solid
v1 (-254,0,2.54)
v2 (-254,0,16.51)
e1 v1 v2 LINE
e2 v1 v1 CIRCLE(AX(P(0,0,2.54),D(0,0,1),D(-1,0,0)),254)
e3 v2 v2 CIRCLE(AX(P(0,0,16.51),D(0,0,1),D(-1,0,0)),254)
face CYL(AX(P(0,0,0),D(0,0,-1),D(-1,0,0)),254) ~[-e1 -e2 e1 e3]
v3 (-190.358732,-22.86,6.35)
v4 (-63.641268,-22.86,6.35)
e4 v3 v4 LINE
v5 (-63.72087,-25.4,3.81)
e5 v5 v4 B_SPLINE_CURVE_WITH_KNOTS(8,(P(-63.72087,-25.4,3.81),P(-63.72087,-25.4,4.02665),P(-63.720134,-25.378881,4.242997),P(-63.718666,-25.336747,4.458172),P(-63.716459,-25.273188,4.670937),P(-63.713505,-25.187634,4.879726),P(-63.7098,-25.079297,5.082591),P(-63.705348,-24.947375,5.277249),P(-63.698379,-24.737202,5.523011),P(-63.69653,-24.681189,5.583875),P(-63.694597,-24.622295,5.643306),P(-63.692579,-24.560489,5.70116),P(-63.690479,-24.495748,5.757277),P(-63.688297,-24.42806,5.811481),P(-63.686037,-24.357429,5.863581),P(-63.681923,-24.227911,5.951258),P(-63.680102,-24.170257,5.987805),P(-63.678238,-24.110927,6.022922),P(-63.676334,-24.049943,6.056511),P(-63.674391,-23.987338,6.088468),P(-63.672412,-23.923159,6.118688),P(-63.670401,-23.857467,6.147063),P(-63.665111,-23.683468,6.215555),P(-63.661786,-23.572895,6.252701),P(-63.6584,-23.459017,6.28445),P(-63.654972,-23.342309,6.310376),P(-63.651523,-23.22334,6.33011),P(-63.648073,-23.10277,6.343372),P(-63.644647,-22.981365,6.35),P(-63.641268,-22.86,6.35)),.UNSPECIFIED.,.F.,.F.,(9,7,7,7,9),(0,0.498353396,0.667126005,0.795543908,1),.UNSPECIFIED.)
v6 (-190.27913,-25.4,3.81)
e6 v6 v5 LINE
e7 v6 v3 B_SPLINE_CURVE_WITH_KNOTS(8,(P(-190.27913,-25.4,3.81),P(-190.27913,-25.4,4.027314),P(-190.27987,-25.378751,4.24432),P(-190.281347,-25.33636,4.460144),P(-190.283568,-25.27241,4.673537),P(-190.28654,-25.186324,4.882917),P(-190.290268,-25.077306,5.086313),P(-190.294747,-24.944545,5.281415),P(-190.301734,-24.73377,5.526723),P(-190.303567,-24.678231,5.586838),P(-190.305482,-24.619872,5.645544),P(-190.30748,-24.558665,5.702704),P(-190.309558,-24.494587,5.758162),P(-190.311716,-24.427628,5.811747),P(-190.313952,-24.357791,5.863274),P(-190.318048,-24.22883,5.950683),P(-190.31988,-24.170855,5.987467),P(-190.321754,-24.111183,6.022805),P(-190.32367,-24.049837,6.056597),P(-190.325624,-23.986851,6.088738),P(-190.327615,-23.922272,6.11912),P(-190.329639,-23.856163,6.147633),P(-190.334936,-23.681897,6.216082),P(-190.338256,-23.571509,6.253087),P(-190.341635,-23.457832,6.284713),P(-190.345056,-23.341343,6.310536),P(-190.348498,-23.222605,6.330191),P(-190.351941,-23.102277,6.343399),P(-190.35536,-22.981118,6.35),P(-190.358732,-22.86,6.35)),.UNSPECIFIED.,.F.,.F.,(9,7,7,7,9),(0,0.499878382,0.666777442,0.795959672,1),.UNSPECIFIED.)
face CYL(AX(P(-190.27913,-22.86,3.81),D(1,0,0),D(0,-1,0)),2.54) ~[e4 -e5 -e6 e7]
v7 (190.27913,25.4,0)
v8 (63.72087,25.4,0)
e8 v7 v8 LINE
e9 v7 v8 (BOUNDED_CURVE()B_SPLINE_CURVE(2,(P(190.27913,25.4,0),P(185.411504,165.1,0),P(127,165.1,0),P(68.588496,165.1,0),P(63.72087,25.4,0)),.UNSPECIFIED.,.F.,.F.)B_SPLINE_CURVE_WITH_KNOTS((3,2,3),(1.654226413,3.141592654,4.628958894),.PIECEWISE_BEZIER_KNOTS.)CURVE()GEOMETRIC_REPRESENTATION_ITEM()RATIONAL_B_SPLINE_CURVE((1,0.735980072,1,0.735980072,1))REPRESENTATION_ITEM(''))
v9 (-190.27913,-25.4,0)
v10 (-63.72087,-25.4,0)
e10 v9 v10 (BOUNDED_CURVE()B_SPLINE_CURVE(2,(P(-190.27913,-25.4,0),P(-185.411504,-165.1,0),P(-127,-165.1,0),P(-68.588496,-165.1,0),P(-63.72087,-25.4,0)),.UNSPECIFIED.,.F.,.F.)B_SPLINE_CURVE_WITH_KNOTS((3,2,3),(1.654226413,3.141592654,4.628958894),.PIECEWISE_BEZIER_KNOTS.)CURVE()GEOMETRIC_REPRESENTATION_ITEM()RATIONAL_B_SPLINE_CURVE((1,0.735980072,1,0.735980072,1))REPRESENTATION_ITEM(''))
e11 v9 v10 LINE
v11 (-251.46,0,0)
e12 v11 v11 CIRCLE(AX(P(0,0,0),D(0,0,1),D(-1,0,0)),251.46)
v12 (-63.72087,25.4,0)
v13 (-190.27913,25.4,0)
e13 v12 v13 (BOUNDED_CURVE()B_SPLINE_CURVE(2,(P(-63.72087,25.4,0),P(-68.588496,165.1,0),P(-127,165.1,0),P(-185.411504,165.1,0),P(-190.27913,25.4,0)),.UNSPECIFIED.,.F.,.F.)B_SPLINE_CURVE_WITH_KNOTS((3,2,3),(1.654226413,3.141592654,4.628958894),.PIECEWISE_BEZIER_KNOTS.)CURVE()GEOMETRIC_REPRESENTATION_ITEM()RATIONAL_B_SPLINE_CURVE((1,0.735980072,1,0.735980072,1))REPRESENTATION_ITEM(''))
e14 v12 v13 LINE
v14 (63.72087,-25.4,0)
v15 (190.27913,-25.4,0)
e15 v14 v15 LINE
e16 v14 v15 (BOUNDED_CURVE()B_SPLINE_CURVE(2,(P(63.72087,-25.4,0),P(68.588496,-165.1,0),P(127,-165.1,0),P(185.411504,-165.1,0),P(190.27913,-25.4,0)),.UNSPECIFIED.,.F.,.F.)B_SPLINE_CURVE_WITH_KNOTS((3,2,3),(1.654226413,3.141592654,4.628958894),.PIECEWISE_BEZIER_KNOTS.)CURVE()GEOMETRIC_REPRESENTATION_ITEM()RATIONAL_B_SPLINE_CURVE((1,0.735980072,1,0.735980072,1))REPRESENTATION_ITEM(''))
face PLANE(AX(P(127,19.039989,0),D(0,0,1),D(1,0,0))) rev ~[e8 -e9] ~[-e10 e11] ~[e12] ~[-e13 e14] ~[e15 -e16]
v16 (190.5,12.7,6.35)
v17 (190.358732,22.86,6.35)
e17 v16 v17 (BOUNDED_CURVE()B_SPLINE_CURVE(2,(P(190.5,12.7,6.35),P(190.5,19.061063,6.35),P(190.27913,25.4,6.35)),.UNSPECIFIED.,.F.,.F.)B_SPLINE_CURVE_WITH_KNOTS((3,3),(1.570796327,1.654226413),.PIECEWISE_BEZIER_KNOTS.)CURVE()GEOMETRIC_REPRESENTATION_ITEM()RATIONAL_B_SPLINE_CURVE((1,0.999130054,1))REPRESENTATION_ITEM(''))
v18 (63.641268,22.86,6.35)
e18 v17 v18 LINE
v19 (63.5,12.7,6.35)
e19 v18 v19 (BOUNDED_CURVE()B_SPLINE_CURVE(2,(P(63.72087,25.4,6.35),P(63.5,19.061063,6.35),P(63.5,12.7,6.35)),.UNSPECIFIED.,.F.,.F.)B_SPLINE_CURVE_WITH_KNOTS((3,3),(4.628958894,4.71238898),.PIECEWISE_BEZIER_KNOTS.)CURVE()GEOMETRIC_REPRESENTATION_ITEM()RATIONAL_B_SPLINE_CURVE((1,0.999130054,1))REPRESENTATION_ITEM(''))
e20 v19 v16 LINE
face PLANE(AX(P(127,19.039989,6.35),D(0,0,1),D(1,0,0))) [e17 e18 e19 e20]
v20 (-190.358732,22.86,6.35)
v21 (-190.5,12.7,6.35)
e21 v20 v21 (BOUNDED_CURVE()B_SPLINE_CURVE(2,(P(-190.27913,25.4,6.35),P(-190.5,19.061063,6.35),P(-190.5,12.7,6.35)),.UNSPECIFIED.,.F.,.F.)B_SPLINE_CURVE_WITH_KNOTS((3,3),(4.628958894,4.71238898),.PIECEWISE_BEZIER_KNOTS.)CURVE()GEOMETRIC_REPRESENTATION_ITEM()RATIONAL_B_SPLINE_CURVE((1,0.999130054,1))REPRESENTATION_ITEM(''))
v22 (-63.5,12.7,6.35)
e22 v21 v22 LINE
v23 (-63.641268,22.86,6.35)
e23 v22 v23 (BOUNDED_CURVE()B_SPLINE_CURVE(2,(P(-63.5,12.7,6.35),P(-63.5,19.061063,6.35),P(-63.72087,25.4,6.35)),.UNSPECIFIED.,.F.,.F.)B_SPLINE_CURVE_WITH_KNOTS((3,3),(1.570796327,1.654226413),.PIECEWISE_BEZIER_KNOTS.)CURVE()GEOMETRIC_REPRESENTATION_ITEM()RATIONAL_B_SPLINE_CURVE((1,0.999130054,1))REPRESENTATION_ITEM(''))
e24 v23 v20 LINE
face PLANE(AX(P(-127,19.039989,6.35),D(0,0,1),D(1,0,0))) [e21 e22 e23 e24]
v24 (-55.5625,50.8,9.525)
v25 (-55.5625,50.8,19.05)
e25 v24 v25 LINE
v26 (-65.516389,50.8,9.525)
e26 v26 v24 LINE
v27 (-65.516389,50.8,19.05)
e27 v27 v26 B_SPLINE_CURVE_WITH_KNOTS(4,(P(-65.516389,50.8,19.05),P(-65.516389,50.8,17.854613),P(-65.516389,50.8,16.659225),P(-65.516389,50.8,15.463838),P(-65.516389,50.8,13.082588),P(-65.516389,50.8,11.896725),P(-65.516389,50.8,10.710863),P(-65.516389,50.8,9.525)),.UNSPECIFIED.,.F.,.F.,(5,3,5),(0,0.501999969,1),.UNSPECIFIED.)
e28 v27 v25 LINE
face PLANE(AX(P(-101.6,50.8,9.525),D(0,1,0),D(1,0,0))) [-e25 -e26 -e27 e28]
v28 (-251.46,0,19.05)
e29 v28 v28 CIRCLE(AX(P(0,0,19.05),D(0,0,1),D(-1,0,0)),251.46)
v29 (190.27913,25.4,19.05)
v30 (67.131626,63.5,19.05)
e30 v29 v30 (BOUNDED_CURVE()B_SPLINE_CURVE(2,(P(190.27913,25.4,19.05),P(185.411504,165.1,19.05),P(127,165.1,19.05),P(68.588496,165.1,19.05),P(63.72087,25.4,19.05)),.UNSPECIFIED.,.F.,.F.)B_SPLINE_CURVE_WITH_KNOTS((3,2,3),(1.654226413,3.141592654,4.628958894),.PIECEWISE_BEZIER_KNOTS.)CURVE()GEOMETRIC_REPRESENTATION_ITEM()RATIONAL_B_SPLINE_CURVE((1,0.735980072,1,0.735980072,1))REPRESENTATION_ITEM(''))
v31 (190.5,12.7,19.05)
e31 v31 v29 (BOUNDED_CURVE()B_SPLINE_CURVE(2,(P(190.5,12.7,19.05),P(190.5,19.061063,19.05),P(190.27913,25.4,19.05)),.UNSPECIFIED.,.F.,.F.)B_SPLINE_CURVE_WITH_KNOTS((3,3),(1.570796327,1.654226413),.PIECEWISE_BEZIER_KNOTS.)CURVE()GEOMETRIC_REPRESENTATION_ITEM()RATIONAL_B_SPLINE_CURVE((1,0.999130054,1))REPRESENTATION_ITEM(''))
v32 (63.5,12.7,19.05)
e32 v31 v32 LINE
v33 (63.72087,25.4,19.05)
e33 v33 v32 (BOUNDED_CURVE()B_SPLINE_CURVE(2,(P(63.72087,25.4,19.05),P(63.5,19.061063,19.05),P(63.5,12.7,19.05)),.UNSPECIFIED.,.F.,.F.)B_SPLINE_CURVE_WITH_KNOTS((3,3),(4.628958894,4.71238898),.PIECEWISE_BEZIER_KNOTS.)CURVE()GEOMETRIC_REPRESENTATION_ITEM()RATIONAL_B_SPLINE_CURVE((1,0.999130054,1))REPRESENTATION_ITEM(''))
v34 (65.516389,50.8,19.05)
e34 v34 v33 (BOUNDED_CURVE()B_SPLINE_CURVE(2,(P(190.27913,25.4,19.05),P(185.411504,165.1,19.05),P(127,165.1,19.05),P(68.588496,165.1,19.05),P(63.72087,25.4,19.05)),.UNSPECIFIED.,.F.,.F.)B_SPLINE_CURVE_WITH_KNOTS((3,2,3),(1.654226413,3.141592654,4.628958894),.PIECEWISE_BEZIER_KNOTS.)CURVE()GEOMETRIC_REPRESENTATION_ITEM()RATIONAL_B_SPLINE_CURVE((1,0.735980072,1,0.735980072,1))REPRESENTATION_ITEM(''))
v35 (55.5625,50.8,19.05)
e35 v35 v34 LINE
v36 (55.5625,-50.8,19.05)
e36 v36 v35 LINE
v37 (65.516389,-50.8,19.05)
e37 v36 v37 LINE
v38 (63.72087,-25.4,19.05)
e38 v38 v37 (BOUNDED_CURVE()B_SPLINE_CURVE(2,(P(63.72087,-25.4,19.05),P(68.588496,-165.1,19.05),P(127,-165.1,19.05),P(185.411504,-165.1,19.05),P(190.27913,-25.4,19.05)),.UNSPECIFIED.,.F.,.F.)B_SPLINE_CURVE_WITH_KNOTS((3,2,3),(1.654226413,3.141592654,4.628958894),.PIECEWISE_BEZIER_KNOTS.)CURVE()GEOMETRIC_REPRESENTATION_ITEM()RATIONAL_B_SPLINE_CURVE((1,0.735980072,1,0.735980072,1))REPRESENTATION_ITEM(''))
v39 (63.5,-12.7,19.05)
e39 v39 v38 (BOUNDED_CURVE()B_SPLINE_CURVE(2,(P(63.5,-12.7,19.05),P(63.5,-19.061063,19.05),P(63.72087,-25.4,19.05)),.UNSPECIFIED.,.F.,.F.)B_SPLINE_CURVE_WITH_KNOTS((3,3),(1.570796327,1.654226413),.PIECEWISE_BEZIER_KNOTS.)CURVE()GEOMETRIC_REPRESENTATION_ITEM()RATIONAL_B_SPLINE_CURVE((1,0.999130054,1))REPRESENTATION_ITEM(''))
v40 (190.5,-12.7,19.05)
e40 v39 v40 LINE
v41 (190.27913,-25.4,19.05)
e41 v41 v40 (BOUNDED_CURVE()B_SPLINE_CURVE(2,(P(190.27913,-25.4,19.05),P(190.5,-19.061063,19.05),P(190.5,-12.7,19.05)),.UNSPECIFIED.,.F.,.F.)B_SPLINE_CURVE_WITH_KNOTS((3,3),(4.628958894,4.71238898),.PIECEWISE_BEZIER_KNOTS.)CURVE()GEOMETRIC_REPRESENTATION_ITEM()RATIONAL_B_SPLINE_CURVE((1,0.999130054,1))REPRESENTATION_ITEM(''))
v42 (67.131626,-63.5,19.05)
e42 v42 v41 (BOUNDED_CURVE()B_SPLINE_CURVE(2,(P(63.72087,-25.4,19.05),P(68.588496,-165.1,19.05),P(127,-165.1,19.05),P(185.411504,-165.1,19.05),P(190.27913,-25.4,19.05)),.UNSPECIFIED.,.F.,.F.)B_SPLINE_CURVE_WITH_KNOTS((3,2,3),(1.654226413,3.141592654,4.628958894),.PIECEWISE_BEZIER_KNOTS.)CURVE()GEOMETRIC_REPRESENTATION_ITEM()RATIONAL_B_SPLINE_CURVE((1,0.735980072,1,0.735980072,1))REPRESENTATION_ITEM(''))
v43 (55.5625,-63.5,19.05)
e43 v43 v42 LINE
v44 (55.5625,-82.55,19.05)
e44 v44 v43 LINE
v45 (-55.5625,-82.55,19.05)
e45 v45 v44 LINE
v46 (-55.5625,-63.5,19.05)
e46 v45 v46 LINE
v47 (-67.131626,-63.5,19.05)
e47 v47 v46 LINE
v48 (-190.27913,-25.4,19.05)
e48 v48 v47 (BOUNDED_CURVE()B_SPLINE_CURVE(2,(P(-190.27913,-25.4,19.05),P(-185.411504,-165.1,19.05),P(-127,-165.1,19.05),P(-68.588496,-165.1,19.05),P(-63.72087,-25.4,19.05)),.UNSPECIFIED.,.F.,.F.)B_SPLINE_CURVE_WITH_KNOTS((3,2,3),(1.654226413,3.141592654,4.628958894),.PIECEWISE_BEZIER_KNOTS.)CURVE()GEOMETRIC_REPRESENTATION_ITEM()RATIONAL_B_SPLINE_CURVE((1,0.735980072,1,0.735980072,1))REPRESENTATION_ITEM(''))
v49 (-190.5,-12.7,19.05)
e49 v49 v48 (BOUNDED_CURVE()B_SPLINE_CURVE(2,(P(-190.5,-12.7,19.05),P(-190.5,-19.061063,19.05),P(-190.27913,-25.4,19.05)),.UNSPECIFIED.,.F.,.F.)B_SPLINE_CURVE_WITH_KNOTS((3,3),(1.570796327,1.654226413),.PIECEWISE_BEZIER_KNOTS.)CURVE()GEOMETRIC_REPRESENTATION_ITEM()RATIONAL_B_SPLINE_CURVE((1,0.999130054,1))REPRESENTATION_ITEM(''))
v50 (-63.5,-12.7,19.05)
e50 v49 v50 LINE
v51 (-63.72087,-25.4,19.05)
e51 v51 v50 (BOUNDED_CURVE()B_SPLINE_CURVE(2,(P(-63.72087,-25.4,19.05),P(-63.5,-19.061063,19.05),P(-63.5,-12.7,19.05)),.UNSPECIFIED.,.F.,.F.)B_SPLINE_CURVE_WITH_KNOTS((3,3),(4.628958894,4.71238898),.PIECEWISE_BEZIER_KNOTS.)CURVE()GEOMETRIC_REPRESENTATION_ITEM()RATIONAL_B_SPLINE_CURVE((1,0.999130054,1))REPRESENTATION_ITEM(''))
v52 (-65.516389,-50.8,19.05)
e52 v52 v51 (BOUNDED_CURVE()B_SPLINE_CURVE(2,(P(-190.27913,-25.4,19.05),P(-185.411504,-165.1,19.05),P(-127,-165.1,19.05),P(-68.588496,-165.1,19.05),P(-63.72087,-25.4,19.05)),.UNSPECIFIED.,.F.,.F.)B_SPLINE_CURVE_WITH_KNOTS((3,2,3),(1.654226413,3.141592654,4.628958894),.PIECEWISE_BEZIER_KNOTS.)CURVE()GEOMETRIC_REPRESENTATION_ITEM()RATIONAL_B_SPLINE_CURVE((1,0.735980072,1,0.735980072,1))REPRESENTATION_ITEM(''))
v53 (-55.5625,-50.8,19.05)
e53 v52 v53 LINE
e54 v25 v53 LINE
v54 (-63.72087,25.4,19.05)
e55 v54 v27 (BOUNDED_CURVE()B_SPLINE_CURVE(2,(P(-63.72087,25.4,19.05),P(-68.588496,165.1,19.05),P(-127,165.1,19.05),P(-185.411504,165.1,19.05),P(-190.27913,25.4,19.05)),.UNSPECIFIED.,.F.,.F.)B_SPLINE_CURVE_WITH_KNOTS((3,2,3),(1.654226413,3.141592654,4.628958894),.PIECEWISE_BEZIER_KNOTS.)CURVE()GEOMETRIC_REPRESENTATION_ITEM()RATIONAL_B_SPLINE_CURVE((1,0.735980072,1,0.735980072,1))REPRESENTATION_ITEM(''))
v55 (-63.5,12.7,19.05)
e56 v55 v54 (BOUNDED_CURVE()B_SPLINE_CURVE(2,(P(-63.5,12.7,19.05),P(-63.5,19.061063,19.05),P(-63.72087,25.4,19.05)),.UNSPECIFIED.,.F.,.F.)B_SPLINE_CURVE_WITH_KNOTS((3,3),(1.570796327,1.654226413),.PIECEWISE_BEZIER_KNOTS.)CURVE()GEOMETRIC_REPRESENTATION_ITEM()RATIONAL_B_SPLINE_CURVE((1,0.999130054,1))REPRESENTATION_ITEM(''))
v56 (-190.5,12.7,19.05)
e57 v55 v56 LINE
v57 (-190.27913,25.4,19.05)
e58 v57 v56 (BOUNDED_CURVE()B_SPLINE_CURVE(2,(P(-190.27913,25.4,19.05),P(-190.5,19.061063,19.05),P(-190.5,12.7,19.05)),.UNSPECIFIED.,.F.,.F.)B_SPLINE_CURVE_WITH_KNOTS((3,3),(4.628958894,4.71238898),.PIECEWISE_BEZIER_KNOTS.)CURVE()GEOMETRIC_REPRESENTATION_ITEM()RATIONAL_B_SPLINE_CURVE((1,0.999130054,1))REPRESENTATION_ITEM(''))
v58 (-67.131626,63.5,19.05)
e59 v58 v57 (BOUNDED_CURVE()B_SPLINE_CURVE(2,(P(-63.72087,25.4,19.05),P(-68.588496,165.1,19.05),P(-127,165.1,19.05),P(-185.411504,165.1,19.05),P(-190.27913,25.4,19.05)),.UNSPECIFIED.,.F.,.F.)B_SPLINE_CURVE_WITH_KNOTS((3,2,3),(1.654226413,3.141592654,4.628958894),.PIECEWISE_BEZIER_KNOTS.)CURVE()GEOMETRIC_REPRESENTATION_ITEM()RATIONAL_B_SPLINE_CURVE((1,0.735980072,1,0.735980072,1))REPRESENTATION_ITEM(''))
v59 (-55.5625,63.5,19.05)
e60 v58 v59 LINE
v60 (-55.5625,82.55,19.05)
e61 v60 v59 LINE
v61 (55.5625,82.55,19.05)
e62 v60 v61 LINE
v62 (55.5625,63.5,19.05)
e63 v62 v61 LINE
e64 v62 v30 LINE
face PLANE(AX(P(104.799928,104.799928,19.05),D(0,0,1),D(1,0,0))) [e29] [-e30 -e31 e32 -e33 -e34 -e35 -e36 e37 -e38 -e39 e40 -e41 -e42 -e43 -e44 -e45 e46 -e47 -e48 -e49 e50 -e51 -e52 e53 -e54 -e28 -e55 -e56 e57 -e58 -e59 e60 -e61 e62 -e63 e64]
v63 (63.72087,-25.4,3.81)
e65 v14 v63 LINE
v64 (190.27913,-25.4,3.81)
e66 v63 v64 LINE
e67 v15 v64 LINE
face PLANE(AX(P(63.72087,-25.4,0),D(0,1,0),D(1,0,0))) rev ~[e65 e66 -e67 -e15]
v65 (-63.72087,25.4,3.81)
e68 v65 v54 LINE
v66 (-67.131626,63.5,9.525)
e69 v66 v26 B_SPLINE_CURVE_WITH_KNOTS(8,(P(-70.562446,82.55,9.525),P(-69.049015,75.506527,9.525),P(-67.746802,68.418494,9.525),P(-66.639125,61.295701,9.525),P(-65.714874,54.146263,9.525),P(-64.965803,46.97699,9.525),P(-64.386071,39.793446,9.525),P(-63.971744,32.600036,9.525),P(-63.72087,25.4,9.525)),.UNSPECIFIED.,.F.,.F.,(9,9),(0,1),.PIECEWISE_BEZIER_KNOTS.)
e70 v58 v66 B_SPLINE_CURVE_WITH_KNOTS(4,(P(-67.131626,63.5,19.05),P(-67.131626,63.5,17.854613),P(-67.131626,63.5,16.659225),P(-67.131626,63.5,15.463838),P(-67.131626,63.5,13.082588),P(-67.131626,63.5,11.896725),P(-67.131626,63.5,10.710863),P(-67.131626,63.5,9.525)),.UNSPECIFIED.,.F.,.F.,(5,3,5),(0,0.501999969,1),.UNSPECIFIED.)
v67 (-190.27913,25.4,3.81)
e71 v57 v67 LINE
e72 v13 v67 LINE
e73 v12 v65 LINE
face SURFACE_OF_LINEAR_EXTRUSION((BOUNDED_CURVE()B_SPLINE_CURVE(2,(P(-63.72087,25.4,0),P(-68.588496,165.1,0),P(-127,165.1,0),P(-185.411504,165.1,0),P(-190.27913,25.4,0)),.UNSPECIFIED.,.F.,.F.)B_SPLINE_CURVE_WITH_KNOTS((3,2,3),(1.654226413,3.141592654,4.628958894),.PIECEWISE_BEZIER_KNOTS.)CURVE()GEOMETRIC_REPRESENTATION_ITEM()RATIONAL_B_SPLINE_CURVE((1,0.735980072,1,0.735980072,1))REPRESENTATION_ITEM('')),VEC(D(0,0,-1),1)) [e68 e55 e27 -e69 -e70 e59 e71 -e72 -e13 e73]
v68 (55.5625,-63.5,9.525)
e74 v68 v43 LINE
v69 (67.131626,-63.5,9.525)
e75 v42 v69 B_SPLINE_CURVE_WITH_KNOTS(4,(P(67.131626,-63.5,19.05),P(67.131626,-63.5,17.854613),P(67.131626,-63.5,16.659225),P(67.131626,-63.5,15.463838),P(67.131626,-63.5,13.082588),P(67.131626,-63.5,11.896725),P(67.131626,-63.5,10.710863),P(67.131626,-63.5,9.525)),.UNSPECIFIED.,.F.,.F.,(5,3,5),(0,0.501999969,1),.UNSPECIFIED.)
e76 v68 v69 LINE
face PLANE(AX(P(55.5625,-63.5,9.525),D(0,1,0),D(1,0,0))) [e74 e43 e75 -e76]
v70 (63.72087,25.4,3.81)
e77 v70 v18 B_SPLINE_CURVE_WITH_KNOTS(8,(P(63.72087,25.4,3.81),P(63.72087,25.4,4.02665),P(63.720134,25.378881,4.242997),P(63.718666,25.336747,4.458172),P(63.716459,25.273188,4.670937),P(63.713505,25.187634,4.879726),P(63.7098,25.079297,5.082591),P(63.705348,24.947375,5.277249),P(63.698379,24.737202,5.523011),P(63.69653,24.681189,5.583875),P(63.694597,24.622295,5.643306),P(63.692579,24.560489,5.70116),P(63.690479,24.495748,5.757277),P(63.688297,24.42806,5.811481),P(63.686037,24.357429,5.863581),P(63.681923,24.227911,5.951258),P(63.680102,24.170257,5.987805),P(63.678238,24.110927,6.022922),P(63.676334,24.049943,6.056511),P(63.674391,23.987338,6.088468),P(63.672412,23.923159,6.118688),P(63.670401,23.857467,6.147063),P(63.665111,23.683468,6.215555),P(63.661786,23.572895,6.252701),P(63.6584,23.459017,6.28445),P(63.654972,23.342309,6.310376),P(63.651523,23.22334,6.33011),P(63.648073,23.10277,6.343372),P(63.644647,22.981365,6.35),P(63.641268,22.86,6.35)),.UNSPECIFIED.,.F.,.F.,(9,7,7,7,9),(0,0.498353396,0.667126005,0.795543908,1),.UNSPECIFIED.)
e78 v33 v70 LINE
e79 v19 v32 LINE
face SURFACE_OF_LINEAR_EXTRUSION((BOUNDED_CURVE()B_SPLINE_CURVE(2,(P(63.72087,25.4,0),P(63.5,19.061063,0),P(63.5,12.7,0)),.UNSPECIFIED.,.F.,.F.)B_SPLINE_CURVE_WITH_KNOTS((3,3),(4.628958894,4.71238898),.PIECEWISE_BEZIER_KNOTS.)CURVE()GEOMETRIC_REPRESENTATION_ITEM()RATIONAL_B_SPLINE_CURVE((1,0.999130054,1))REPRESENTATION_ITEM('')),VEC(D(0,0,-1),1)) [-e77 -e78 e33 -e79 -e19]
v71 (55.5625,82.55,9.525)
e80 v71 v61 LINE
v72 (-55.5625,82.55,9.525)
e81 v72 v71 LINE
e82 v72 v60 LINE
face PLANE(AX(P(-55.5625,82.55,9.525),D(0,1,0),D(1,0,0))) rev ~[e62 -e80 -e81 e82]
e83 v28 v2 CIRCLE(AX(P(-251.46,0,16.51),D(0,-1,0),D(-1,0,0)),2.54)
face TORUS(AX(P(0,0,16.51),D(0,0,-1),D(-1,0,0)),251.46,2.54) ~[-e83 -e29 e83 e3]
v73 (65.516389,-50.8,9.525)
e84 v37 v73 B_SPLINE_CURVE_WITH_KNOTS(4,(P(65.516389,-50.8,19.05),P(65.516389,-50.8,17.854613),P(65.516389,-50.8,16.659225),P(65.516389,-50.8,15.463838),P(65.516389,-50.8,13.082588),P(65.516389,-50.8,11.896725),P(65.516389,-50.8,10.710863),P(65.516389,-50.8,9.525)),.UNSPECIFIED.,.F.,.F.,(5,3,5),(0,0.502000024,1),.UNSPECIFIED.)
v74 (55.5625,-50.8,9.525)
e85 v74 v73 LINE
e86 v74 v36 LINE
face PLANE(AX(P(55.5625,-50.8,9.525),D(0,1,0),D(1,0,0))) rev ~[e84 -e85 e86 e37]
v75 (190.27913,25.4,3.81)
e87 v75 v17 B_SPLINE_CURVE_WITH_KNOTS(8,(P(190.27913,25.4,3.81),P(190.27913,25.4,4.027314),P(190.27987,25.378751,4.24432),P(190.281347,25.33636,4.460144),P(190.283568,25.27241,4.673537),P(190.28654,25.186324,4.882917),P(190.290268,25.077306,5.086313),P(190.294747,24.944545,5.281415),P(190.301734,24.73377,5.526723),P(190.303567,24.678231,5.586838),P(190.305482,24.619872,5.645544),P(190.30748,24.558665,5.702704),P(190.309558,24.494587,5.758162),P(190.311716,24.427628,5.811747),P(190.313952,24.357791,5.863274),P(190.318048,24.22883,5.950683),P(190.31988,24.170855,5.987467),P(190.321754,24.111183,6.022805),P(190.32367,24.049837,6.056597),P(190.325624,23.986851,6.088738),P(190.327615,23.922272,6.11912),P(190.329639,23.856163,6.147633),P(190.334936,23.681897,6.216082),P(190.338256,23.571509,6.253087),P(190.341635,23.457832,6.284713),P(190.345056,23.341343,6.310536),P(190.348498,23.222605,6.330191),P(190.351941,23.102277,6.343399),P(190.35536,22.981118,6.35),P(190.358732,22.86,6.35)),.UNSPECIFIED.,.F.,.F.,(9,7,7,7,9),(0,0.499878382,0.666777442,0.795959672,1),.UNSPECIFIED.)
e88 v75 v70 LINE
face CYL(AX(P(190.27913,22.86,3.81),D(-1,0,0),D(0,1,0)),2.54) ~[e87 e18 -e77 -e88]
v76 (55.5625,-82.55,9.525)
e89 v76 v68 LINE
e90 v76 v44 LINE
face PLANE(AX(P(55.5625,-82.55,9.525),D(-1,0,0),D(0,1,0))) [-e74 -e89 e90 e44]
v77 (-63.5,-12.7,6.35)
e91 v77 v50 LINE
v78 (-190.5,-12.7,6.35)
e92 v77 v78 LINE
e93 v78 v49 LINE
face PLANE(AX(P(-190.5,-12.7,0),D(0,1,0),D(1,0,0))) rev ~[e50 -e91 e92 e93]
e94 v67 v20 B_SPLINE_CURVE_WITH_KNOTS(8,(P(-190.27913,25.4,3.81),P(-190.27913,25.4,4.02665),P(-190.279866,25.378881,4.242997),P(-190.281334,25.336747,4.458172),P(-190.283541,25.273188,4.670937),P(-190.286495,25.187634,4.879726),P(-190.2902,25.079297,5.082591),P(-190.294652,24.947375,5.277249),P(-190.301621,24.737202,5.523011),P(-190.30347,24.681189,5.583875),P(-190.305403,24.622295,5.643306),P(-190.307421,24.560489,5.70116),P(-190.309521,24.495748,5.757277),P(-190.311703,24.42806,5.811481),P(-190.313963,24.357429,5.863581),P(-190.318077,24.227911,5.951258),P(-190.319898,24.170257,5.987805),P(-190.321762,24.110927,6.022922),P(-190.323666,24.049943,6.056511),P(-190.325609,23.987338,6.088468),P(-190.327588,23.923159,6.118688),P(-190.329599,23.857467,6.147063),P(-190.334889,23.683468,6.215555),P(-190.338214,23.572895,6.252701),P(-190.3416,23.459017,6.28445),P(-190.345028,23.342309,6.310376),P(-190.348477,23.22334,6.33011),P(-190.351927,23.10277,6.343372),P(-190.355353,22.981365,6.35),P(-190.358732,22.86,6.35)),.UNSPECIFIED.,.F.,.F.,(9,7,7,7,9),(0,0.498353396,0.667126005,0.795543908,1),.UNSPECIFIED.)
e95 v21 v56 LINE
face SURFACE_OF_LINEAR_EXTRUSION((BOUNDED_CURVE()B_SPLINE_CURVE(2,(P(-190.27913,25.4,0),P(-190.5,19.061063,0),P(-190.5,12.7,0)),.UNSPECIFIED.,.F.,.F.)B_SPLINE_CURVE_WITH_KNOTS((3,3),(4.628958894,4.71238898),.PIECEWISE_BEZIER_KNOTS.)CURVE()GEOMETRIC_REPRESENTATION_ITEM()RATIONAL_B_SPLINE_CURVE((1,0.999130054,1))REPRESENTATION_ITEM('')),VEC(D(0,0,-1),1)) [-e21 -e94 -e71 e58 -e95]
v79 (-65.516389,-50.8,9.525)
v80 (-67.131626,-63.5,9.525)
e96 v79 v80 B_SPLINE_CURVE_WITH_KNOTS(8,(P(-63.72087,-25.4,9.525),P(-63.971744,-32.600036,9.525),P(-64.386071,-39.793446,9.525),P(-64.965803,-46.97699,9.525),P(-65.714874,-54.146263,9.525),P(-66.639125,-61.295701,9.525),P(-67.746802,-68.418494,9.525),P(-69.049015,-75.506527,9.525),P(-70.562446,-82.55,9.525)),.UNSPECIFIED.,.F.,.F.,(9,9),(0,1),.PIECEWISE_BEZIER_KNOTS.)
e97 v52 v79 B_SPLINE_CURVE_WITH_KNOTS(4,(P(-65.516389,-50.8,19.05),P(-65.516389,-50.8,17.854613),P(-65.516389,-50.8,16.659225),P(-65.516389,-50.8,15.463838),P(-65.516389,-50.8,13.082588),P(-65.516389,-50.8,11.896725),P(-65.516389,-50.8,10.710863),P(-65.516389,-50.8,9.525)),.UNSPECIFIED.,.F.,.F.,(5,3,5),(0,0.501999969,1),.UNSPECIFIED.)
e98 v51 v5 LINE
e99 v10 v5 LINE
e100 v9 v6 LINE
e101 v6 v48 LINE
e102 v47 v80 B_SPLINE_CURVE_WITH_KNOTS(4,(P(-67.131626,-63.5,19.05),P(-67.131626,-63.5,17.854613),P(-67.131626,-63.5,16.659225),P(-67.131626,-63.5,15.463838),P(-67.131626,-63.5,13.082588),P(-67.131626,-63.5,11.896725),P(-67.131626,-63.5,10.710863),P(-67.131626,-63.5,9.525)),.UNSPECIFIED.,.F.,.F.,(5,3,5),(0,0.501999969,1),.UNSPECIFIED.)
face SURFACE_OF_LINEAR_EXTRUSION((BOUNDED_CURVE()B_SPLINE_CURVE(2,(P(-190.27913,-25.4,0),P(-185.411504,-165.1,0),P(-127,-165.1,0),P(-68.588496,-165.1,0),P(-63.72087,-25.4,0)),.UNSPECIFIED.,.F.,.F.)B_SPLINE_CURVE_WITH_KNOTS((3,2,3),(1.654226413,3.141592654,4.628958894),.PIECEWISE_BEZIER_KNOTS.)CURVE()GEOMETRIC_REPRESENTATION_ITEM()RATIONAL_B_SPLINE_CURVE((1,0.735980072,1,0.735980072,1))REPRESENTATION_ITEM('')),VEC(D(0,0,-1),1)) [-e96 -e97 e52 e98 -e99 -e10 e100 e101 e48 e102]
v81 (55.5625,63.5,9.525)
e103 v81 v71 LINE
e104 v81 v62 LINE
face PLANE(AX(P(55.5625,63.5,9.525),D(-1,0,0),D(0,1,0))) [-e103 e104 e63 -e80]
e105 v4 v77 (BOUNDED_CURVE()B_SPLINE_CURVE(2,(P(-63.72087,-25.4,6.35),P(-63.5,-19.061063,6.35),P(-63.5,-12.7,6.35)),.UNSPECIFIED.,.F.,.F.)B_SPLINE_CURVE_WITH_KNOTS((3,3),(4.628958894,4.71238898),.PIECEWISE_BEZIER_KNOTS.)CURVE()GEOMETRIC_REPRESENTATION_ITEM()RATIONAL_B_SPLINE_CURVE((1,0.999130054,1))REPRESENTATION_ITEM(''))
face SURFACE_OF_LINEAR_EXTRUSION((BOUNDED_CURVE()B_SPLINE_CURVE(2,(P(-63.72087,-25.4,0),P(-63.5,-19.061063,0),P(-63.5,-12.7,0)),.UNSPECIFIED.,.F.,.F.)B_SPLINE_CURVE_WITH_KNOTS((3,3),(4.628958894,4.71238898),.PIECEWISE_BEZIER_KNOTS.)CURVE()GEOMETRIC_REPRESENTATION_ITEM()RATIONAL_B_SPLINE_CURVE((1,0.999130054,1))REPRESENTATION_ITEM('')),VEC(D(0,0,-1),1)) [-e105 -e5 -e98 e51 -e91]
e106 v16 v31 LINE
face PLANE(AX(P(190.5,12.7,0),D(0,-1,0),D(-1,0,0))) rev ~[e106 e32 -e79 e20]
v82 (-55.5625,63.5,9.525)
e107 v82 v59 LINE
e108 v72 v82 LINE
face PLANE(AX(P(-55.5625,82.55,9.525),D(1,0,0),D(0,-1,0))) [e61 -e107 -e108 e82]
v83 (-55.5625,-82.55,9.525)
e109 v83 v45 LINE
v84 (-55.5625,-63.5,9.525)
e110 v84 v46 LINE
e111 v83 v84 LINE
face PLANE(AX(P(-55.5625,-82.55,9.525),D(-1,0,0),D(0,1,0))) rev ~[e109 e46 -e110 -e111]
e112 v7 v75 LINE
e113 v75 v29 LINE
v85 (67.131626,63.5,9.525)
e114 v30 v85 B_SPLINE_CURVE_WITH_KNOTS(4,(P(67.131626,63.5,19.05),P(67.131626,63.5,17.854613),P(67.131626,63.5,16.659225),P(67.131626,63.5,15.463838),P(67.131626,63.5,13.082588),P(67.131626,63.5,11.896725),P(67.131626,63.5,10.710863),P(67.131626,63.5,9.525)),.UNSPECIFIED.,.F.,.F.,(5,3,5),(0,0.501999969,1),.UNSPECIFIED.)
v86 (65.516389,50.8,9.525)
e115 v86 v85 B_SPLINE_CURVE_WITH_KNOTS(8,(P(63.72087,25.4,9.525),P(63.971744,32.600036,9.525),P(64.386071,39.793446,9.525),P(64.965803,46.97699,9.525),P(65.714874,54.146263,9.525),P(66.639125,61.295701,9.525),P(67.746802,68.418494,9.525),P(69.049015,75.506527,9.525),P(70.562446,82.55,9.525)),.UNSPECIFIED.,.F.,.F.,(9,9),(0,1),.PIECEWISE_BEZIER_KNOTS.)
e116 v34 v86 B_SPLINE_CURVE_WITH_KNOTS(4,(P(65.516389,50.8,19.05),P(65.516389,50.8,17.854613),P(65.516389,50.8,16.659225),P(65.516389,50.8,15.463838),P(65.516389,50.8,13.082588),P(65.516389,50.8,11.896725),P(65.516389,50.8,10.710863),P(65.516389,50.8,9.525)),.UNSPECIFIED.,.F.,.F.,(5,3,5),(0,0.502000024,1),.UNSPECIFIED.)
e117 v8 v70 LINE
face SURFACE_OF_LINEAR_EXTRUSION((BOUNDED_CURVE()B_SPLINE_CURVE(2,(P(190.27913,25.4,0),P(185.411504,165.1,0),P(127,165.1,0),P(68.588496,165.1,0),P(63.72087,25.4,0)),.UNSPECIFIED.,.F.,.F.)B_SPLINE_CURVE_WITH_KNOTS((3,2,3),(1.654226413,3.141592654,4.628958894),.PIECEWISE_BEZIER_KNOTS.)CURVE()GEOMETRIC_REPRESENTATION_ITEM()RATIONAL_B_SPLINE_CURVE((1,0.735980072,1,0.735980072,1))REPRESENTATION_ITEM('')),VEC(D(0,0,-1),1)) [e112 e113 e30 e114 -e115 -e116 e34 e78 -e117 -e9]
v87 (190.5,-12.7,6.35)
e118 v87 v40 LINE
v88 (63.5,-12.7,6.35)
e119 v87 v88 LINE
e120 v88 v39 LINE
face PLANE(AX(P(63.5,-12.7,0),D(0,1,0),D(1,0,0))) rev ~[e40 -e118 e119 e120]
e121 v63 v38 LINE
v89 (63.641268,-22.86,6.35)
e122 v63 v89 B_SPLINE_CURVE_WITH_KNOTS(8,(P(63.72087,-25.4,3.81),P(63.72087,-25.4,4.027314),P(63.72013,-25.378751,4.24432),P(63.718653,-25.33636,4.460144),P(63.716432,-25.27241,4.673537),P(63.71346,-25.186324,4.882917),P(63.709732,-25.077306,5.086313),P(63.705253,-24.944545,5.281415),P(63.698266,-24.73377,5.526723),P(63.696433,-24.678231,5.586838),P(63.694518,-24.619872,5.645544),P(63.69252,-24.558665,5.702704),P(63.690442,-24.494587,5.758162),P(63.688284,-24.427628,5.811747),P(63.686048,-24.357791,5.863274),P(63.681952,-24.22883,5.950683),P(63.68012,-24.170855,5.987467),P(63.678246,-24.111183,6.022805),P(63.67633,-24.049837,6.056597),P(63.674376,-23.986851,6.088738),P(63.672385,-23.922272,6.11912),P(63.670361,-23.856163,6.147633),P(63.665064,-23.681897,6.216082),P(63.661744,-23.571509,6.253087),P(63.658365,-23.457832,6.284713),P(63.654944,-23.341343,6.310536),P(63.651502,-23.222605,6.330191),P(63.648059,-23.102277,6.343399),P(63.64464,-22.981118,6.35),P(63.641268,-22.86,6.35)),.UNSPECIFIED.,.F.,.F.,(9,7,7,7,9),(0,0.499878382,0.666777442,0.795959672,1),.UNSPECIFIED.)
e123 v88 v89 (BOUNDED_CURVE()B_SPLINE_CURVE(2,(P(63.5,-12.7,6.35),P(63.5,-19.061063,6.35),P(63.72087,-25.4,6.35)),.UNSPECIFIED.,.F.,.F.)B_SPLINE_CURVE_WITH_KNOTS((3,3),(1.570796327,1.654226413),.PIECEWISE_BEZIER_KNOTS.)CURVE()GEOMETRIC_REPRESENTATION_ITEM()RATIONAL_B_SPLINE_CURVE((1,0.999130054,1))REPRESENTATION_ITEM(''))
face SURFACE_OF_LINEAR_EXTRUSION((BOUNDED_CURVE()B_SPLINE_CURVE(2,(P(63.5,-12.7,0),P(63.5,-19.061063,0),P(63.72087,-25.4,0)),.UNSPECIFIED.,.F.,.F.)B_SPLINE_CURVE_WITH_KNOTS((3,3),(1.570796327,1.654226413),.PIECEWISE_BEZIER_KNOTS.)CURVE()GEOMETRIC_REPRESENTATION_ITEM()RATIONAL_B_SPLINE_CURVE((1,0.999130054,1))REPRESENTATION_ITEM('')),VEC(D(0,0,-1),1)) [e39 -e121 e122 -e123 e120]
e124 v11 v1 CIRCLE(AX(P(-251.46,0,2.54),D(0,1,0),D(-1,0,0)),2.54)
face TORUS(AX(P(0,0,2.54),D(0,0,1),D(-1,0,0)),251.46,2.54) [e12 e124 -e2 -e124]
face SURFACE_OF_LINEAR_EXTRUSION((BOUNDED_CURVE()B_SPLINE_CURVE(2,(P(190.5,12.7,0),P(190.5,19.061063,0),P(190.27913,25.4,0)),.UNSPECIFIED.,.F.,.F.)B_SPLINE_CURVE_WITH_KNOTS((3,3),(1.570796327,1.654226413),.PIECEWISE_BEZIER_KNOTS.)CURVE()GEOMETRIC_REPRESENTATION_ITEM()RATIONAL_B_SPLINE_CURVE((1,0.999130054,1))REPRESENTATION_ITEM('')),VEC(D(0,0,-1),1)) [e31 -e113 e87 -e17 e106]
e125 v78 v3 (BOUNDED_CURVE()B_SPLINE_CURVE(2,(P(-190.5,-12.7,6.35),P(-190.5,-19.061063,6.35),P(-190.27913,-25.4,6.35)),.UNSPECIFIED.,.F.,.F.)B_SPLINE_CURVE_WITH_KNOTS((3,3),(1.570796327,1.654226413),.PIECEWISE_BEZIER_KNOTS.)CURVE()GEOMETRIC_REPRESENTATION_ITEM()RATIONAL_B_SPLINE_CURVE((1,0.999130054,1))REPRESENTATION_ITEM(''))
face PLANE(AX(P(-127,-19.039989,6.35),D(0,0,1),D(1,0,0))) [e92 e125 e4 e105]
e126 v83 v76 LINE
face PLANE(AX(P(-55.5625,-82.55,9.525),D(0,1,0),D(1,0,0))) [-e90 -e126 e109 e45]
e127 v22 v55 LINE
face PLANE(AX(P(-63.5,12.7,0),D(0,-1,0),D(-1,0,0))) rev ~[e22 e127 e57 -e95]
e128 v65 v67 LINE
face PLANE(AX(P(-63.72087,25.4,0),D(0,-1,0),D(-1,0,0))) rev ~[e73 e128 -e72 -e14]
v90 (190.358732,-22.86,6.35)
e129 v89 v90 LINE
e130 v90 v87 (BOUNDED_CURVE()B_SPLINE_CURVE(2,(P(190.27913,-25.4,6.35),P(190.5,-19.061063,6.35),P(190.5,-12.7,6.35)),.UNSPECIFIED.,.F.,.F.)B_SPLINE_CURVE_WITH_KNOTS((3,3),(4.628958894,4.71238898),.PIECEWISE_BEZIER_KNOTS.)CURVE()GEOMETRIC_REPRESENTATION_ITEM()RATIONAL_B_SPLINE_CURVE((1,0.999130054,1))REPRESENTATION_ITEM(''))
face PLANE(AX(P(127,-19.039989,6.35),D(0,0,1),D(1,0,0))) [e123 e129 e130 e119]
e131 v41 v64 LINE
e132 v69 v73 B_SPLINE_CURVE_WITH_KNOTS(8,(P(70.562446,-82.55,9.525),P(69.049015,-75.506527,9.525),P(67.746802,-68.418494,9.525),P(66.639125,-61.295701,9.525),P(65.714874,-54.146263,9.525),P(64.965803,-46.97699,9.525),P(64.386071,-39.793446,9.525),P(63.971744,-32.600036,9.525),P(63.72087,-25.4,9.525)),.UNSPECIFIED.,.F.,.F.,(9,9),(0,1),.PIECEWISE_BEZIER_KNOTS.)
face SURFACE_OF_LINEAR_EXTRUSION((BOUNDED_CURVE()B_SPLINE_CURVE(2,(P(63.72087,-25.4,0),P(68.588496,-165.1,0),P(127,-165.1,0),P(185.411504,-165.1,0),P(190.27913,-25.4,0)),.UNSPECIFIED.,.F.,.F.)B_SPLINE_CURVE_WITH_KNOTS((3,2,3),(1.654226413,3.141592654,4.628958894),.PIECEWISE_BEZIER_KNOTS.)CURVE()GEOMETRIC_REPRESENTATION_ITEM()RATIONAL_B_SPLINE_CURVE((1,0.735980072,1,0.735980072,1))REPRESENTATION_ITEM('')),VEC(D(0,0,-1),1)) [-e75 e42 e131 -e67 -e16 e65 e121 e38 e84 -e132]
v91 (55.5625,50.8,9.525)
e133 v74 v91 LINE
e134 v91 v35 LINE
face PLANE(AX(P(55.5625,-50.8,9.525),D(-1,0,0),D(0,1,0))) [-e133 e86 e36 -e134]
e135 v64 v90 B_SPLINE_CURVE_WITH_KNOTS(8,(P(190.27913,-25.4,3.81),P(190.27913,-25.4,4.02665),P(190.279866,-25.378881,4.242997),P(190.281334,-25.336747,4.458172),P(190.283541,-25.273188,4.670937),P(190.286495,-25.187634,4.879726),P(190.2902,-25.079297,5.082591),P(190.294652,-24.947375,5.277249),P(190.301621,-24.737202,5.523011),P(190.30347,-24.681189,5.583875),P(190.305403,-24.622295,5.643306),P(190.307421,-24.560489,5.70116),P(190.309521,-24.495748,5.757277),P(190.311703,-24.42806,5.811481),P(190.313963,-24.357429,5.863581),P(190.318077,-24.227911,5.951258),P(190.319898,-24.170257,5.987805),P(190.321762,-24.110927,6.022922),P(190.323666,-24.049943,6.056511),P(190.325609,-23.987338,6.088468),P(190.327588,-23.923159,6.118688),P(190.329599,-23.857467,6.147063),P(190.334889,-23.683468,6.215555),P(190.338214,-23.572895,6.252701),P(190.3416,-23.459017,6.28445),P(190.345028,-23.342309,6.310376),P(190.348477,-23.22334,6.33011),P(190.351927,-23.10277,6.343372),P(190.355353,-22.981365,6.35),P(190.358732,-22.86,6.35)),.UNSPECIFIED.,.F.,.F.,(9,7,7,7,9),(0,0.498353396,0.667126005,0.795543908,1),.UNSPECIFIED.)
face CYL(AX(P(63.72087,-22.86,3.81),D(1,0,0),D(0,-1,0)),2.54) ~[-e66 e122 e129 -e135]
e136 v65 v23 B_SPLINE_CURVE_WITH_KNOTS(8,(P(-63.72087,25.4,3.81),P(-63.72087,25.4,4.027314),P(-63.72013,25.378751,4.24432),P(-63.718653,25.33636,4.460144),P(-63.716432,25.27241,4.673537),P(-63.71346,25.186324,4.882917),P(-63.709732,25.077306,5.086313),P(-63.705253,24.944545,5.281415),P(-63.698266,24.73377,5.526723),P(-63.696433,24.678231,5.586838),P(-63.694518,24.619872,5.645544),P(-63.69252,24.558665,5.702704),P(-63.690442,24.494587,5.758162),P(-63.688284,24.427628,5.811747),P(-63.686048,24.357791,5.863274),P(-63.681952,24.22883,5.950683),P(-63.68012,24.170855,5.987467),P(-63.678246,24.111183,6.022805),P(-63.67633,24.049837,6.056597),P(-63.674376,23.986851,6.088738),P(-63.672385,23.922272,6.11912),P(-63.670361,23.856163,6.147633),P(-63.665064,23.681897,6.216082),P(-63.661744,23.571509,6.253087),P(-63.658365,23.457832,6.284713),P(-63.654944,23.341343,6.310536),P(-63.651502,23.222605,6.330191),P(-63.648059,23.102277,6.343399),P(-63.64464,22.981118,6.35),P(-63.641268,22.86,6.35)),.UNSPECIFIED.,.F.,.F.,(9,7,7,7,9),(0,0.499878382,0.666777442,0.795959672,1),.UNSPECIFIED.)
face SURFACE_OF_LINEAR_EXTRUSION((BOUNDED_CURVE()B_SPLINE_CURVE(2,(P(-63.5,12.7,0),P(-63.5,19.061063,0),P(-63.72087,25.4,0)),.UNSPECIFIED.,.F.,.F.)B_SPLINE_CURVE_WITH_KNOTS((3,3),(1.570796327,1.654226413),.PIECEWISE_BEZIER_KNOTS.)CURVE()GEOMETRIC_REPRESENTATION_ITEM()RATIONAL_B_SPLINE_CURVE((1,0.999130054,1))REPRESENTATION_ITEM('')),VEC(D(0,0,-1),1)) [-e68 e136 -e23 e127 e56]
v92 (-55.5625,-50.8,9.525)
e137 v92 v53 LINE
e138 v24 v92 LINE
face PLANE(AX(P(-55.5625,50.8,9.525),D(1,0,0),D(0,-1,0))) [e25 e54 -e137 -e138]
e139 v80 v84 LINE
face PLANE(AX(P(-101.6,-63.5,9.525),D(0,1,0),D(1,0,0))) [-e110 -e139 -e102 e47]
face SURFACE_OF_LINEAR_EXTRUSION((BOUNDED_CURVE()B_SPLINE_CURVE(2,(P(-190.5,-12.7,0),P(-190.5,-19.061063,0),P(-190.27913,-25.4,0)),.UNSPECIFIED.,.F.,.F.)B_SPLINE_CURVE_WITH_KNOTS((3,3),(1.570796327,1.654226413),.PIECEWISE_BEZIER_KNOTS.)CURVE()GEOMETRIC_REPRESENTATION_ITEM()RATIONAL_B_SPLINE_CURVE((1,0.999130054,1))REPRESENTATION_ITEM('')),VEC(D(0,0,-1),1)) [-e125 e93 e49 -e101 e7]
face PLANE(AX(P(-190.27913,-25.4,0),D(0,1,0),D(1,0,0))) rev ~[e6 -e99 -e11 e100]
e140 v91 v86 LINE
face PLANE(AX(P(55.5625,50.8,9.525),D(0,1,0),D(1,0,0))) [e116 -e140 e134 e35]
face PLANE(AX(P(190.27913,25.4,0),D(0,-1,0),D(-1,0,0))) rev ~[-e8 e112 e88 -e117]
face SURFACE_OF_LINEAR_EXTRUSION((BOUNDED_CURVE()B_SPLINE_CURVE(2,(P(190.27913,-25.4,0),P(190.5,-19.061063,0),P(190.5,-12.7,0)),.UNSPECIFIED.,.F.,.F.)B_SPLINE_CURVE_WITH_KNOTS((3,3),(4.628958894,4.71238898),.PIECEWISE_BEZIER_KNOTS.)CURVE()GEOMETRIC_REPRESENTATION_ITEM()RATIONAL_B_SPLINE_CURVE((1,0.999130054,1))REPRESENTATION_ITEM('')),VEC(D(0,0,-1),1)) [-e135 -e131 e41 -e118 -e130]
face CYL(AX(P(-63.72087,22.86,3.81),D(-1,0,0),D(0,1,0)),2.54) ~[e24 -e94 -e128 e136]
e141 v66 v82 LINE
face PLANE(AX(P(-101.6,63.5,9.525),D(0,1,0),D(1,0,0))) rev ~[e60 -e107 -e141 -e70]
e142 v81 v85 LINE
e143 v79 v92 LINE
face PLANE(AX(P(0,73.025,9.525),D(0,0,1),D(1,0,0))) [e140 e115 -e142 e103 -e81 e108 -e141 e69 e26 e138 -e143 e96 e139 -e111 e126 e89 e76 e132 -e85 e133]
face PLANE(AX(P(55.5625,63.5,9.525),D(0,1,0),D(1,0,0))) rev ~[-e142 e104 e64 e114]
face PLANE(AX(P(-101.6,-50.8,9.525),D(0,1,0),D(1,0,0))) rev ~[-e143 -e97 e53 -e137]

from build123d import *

# Parameters (mm, degrees)
F1_DEPTH = 19.05
F2_DEPTH = 6.35
F4_R     = 2.54
F5_START = 9.525
F3_W     = 111.125
F3_H     = 19.05
F3_H_2   = 12.7
F3_W_2   = 46.0375
F5_DEPTH = 9.525


# Not quite as in the source:
# - two fillets or chamfers of one size are made in one step


with BuildPart() as f1:
    # F0 (on Top) → F1 (new body)
    with BuildSketch(Plane.XY):
        with BuildLine():
            Line((0, 0), (254, 0))
            ThreePointArc((254, 0), (179.6051224214, 179.6051224214), (0, 254))
            Line((0, 254), (0, 0))
        make_face()
        with BuildLine():
            add(Edge.make_bspline(
                [(190.5, 12.7), (190.5, 19.0610627513), (190.2791297656, 25.4)],
                knots=[1.5707963268, 1.5707963268, 1.5707963268, 1.6542264134, 1.6542264134, 1.6542264134], degree=2, weights=[1, 0.9991300537, 1]))
            Line((190.5, 12.7), (63.5, 12.7))
            add(Edge.make_bspline(
                [(63.7208702344, 25.4), (63.5, 19.0610627513), (63.5, 12.7)],
                knots=[4.6289588938, 4.6289588938, 4.6289588938, 4.7123889804, 4.7123889804, 4.7123889804], degree=2, weights=[1, 0.9991300537, 1]))
            add(Edge.make_bspline(
                [(190.2791297656, 25.4), (185.411504399, 165.1), (127, 165.1), (68.588495601, 165.1), (63.7208702344, 25.4)],
                knots=[1.6542264134, 1.6542264134, 1.6542264134, 3.1415926536, 3.1415926536, 4.6289588938, 4.6289588938, 4.6289588938], degree=2, weights=[1, 0.7359800722, 1, 0.7359800722, 1]))
        make_face(mode=Mode.SUBTRACT)
        with BuildLine():
            ThreePointArc((0, -254), (179.6051224214, -179.6051224214), (254, 0))
            Line((254, 0), (0, 0))
            Line((0, 0), (0, -254))
        make_face()
        with BuildLine():
            add(Edge.make_bspline(
                [(63.5, -12.7), (63.5, -19.0610627513), (63.7208702344, -25.4)],
                knots=[1.5707963268, 1.5707963268, 1.5707963268, 1.6542264134, 1.6542264134, 1.6542264134], degree=2, weights=[1, 0.9991300537, 1]))
            Line((63.5, -12.7), (190.5, -12.7))
            add(Edge.make_bspline(
                [(190.2791297656, -25.4), (190.5, -19.0610627513), (190.5, -12.7)],
                knots=[4.6289588938, 4.6289588938, 4.6289588938, 4.7123889804, 4.7123889804, 4.7123889804], degree=2, weights=[1, 0.9991300537, 1]))
            add(Edge.make_bspline(
                [(63.7208702344, -25.4), (68.588495601, -165.1), (127, -165.1), (185.411504399, -165.1), (190.2791297656, -25.4)],
                knots=[1.6542264134, 1.6542264134, 1.6542264134, 3.1415926536, 3.1415926536, 4.6289588938, 4.6289588938, 4.6289588938], degree=2, weights=[1, 0.7359800722, 1, 0.7359800722, 1]))
        make_face(mode=Mode.SUBTRACT)
        with BuildLine():
            Line((0, 0), (0, 254))
            ThreePointArc((0, 254), (-179.6051224214, 179.6051224214), (-254, 0))
            Line((-254, 0), (0, 0))
        make_face()
        with BuildLine():
            add(Edge.make_bspline(
                [(-63.5, 12.7), (-63.5, 19.0610627513), (-63.7208702344, 25.4)],
                knots=[1.5707963268, 1.5707963268, 1.5707963268, 1.6542264134, 1.6542264134, 1.6542264134], degree=2, weights=[1, 0.9991300537, 1]))
            Line((-63.5, 12.7), (-190.5, 12.7))
            add(Edge.make_bspline(
                [(-190.2791297656, 25.4), (-190.5, 19.0610627513), (-190.5, 12.7)],
                knots=[4.6289588938, 4.6289588938, 4.6289588938, 4.7123889804, 4.7123889804, 4.7123889804], degree=2, weights=[1, 0.9991300537, 1]))
            add(Edge.make_bspline(
                [(-63.7208702344, 25.4), (-68.588495601, 165.1), (-127, 165.1), (-185.411504399, 165.1), (-190.2791297656, 25.4)],
                knots=[1.6542264134, 1.6542264134, 1.6542264134, 3.1415926536, 3.1415926536, 4.6289588938, 4.6289588938, 4.6289588938], degree=2, weights=[1, 0.7359800722, 1, 0.7359800722, 1]))
        make_face(mode=Mode.SUBTRACT)
        with BuildLine():
            ThreePointArc((-254, 0), (-179.6051224214, -179.6051224214), (0, -254))
            Line((0, -254), (0, 0))
            Line((0, 0), (-254, 0))
        make_face()
        with BuildLine():
            add(Edge.make_bspline(
                [(-190.5, -12.7), (-190.5, -19.0610627513), (-190.2791297656, -25.4)],
                knots=[1.5707963268, 1.5707963268, 1.5707963268, 1.6542264134, 1.6542264134, 1.6542264134], degree=2, weights=[1, 0.9991300537, 1]))
            Line((-190.5, -12.7), (-63.5, -12.7))
            add(Edge.make_bspline(
                [(-63.7208702344, -25.4), (-63.5, -19.0610627513), (-63.5, -12.7)],
                knots=[4.6289588938, 4.6289588938, 4.6289588938, 4.7123889804, 4.7123889804, 4.7123889804], degree=2, weights=[1, 0.9991300537, 1]))
            add(Edge.make_bspline(
                [(-190.2791297656, -25.4), (-185.411504399, -165.1), (-127, -165.1), (-68.588495601, -165.1), (-63.7208702344, -25.4)],
                knots=[1.6542264134, 1.6542264134, 1.6542264134, 3.1415926536, 3.1415926536, 4.6289588938, 4.6289588938, 4.6289588938], degree=2, weights=[1, 0.7359800722, 1, 0.7359800722, 1]))
        make_face(mode=Mode.SUBTRACT)
    extrude(amount=F1_DEPTH)

    # F0 (on Top) → F2 (join)
    with BuildSketch(Plane.XY):
        with BuildLine():
            Line((63.5, 12.7), (190.5, 12.7))
            add(Edge.make_bspline(
                [(190.5, 12.7), (190.5, 19.0610627513), (190.2791297656, 25.4)],
                knots=[1.5707963268, 1.5707963268, 1.5707963268, 1.6542264134, 1.6542264134, 1.6542264134], degree=2, weights=[1, 0.9991300537, 1]))
            Line((190.2791297656, 25.4), (63.7208702344, 25.4))
            add(Edge.make_bspline(
                [(63.7208702344, 25.4), (63.5, 19.0610627513), (63.5, 12.7)],
                knots=[4.6289588938, 4.6289588938, 4.6289588938, 4.7123889804, 4.7123889804, 4.7123889804], degree=2, weights=[1, 0.9991300537, 1]))
        make_face()
        with BuildLine():
            Line((190.5, -12.7), (63.5, -12.7))
            add(Edge.make_bspline(
                [(63.5, -12.7), (63.5, -19.0610627513), (63.7208702344, -25.4)],
                knots=[1.5707963268, 1.5707963268, 1.5707963268, 1.6542264134, 1.6542264134, 1.6542264134], degree=2, weights=[1, 0.9991300537, 1]))
            Line((63.7208702344, -25.4), (190.2791297656, -25.4))
            add(Edge.make_bspline(
                [(190.2791297656, -25.4), (190.5, -19.0610627513), (190.5, -12.7)],
                knots=[4.6289588938, 4.6289588938, 4.6289588938, 4.7123889804, 4.7123889804, 4.7123889804], degree=2, weights=[1, 0.9991300537, 1]))
        make_face()
        with BuildLine():
            Line((-63.5, -12.7), (-190.5, -12.7))
            add(Edge.make_bspline(
                [(-190.5, -12.7), (-190.5, -19.0610627513), (-190.2791297656, -25.4)],
                knots=[1.5707963268, 1.5707963268, 1.5707963268, 1.6542264134, 1.6542264134, 1.6542264134], degree=2, weights=[1, 0.9991300537, 1]))
            Line((-190.2791297656, -25.4), (-63.7208702344, -25.4))
            add(Edge.make_bspline(
                [(-63.7208702344, -25.4), (-63.5, -19.0610627513), (-63.5, -12.7)],
                knots=[4.6289588938, 4.6289588938, 4.6289588938, 4.7123889804, 4.7123889804, 4.7123889804], degree=2, weights=[1, 0.9991300537, 1]))
        make_face()
        with BuildLine():
            Line((-190.5, 12.7), (-63.5, 12.7))
            add(Edge.make_bspline(
                [(-63.5, 12.7), (-63.5, 19.0610627513), (-63.7208702344, 25.4)],
                knots=[1.5707963268, 1.5707963268, 1.5707963268, 1.6542264134, 1.6542264134, 1.6542264134], degree=2, weights=[1, 0.9991300537, 1]))
            Line((-63.7208702344, 25.4), (-190.2791297656, 25.4))
            add(Edge.make_bspline(
                [(-190.2791297656, 25.4), (-190.5, 19.0610627513), (-190.5, 12.7)],
                knots=[4.6289588938, 4.6289588938, 4.6289588938, 4.7123889804, 4.7123889804, 4.7123889804], degree=2, weights=[1, 0.9991300537, 1]))
        make_face()
    extrude(amount=F2_DEPTH)

    # F4
    f4_edges = [f1.edges().sort_by_distance(p)[0] for p in [
        (254, 0, 19.05),
        (-127, -25.4, 6.35),
        (127, -25.4, 6.35),
        (127, 25.4, 6.35),
        (-127, 25.4, 6.35),
        (254, 0, 0),
    ]]
    fillet(f4_edges, radius=F4_R)

    # F3 (on Top) → F5 (cut)
    with BuildSketch(Plane.XY.offset(F5_START)):
        with Locations((0, 73.025)):
            Rectangle(F3_W, F3_H)
        with Locations((0, 57.15)):
            Rectangle(F3_W, F3_H_2)
        with Locations((-78.58125, 57.15)):
            Rectangle(F3_W_2, F3_H_2)
        with Locations((78.58125, 57.15)):
            Rectangle(F3_W_2, F3_H_2)
        Polygon((55.5625, 50.8), (-55.5625, 50.8), (-55.5625, -50.8), (55.5625, -50.8), (55.5625, 0), align=None)
        with Locations((0, -57.15)):
            Rectangle(F3_W, F3_H_2)
        with Locations((-78.58125, -57.15)):
            Rectangle(F3_W_2, F3_H_2)
        with Locations((0, -73.025)):
            Rectangle(F3_W, F3_H)
        with Locations((78.58125, -57.15)):
            Rectangle(F3_W_2, F3_H_2)
    extrude(amount=F5_DEPTH, mode=Mode.SUBTRACT)


solid = f1.part
